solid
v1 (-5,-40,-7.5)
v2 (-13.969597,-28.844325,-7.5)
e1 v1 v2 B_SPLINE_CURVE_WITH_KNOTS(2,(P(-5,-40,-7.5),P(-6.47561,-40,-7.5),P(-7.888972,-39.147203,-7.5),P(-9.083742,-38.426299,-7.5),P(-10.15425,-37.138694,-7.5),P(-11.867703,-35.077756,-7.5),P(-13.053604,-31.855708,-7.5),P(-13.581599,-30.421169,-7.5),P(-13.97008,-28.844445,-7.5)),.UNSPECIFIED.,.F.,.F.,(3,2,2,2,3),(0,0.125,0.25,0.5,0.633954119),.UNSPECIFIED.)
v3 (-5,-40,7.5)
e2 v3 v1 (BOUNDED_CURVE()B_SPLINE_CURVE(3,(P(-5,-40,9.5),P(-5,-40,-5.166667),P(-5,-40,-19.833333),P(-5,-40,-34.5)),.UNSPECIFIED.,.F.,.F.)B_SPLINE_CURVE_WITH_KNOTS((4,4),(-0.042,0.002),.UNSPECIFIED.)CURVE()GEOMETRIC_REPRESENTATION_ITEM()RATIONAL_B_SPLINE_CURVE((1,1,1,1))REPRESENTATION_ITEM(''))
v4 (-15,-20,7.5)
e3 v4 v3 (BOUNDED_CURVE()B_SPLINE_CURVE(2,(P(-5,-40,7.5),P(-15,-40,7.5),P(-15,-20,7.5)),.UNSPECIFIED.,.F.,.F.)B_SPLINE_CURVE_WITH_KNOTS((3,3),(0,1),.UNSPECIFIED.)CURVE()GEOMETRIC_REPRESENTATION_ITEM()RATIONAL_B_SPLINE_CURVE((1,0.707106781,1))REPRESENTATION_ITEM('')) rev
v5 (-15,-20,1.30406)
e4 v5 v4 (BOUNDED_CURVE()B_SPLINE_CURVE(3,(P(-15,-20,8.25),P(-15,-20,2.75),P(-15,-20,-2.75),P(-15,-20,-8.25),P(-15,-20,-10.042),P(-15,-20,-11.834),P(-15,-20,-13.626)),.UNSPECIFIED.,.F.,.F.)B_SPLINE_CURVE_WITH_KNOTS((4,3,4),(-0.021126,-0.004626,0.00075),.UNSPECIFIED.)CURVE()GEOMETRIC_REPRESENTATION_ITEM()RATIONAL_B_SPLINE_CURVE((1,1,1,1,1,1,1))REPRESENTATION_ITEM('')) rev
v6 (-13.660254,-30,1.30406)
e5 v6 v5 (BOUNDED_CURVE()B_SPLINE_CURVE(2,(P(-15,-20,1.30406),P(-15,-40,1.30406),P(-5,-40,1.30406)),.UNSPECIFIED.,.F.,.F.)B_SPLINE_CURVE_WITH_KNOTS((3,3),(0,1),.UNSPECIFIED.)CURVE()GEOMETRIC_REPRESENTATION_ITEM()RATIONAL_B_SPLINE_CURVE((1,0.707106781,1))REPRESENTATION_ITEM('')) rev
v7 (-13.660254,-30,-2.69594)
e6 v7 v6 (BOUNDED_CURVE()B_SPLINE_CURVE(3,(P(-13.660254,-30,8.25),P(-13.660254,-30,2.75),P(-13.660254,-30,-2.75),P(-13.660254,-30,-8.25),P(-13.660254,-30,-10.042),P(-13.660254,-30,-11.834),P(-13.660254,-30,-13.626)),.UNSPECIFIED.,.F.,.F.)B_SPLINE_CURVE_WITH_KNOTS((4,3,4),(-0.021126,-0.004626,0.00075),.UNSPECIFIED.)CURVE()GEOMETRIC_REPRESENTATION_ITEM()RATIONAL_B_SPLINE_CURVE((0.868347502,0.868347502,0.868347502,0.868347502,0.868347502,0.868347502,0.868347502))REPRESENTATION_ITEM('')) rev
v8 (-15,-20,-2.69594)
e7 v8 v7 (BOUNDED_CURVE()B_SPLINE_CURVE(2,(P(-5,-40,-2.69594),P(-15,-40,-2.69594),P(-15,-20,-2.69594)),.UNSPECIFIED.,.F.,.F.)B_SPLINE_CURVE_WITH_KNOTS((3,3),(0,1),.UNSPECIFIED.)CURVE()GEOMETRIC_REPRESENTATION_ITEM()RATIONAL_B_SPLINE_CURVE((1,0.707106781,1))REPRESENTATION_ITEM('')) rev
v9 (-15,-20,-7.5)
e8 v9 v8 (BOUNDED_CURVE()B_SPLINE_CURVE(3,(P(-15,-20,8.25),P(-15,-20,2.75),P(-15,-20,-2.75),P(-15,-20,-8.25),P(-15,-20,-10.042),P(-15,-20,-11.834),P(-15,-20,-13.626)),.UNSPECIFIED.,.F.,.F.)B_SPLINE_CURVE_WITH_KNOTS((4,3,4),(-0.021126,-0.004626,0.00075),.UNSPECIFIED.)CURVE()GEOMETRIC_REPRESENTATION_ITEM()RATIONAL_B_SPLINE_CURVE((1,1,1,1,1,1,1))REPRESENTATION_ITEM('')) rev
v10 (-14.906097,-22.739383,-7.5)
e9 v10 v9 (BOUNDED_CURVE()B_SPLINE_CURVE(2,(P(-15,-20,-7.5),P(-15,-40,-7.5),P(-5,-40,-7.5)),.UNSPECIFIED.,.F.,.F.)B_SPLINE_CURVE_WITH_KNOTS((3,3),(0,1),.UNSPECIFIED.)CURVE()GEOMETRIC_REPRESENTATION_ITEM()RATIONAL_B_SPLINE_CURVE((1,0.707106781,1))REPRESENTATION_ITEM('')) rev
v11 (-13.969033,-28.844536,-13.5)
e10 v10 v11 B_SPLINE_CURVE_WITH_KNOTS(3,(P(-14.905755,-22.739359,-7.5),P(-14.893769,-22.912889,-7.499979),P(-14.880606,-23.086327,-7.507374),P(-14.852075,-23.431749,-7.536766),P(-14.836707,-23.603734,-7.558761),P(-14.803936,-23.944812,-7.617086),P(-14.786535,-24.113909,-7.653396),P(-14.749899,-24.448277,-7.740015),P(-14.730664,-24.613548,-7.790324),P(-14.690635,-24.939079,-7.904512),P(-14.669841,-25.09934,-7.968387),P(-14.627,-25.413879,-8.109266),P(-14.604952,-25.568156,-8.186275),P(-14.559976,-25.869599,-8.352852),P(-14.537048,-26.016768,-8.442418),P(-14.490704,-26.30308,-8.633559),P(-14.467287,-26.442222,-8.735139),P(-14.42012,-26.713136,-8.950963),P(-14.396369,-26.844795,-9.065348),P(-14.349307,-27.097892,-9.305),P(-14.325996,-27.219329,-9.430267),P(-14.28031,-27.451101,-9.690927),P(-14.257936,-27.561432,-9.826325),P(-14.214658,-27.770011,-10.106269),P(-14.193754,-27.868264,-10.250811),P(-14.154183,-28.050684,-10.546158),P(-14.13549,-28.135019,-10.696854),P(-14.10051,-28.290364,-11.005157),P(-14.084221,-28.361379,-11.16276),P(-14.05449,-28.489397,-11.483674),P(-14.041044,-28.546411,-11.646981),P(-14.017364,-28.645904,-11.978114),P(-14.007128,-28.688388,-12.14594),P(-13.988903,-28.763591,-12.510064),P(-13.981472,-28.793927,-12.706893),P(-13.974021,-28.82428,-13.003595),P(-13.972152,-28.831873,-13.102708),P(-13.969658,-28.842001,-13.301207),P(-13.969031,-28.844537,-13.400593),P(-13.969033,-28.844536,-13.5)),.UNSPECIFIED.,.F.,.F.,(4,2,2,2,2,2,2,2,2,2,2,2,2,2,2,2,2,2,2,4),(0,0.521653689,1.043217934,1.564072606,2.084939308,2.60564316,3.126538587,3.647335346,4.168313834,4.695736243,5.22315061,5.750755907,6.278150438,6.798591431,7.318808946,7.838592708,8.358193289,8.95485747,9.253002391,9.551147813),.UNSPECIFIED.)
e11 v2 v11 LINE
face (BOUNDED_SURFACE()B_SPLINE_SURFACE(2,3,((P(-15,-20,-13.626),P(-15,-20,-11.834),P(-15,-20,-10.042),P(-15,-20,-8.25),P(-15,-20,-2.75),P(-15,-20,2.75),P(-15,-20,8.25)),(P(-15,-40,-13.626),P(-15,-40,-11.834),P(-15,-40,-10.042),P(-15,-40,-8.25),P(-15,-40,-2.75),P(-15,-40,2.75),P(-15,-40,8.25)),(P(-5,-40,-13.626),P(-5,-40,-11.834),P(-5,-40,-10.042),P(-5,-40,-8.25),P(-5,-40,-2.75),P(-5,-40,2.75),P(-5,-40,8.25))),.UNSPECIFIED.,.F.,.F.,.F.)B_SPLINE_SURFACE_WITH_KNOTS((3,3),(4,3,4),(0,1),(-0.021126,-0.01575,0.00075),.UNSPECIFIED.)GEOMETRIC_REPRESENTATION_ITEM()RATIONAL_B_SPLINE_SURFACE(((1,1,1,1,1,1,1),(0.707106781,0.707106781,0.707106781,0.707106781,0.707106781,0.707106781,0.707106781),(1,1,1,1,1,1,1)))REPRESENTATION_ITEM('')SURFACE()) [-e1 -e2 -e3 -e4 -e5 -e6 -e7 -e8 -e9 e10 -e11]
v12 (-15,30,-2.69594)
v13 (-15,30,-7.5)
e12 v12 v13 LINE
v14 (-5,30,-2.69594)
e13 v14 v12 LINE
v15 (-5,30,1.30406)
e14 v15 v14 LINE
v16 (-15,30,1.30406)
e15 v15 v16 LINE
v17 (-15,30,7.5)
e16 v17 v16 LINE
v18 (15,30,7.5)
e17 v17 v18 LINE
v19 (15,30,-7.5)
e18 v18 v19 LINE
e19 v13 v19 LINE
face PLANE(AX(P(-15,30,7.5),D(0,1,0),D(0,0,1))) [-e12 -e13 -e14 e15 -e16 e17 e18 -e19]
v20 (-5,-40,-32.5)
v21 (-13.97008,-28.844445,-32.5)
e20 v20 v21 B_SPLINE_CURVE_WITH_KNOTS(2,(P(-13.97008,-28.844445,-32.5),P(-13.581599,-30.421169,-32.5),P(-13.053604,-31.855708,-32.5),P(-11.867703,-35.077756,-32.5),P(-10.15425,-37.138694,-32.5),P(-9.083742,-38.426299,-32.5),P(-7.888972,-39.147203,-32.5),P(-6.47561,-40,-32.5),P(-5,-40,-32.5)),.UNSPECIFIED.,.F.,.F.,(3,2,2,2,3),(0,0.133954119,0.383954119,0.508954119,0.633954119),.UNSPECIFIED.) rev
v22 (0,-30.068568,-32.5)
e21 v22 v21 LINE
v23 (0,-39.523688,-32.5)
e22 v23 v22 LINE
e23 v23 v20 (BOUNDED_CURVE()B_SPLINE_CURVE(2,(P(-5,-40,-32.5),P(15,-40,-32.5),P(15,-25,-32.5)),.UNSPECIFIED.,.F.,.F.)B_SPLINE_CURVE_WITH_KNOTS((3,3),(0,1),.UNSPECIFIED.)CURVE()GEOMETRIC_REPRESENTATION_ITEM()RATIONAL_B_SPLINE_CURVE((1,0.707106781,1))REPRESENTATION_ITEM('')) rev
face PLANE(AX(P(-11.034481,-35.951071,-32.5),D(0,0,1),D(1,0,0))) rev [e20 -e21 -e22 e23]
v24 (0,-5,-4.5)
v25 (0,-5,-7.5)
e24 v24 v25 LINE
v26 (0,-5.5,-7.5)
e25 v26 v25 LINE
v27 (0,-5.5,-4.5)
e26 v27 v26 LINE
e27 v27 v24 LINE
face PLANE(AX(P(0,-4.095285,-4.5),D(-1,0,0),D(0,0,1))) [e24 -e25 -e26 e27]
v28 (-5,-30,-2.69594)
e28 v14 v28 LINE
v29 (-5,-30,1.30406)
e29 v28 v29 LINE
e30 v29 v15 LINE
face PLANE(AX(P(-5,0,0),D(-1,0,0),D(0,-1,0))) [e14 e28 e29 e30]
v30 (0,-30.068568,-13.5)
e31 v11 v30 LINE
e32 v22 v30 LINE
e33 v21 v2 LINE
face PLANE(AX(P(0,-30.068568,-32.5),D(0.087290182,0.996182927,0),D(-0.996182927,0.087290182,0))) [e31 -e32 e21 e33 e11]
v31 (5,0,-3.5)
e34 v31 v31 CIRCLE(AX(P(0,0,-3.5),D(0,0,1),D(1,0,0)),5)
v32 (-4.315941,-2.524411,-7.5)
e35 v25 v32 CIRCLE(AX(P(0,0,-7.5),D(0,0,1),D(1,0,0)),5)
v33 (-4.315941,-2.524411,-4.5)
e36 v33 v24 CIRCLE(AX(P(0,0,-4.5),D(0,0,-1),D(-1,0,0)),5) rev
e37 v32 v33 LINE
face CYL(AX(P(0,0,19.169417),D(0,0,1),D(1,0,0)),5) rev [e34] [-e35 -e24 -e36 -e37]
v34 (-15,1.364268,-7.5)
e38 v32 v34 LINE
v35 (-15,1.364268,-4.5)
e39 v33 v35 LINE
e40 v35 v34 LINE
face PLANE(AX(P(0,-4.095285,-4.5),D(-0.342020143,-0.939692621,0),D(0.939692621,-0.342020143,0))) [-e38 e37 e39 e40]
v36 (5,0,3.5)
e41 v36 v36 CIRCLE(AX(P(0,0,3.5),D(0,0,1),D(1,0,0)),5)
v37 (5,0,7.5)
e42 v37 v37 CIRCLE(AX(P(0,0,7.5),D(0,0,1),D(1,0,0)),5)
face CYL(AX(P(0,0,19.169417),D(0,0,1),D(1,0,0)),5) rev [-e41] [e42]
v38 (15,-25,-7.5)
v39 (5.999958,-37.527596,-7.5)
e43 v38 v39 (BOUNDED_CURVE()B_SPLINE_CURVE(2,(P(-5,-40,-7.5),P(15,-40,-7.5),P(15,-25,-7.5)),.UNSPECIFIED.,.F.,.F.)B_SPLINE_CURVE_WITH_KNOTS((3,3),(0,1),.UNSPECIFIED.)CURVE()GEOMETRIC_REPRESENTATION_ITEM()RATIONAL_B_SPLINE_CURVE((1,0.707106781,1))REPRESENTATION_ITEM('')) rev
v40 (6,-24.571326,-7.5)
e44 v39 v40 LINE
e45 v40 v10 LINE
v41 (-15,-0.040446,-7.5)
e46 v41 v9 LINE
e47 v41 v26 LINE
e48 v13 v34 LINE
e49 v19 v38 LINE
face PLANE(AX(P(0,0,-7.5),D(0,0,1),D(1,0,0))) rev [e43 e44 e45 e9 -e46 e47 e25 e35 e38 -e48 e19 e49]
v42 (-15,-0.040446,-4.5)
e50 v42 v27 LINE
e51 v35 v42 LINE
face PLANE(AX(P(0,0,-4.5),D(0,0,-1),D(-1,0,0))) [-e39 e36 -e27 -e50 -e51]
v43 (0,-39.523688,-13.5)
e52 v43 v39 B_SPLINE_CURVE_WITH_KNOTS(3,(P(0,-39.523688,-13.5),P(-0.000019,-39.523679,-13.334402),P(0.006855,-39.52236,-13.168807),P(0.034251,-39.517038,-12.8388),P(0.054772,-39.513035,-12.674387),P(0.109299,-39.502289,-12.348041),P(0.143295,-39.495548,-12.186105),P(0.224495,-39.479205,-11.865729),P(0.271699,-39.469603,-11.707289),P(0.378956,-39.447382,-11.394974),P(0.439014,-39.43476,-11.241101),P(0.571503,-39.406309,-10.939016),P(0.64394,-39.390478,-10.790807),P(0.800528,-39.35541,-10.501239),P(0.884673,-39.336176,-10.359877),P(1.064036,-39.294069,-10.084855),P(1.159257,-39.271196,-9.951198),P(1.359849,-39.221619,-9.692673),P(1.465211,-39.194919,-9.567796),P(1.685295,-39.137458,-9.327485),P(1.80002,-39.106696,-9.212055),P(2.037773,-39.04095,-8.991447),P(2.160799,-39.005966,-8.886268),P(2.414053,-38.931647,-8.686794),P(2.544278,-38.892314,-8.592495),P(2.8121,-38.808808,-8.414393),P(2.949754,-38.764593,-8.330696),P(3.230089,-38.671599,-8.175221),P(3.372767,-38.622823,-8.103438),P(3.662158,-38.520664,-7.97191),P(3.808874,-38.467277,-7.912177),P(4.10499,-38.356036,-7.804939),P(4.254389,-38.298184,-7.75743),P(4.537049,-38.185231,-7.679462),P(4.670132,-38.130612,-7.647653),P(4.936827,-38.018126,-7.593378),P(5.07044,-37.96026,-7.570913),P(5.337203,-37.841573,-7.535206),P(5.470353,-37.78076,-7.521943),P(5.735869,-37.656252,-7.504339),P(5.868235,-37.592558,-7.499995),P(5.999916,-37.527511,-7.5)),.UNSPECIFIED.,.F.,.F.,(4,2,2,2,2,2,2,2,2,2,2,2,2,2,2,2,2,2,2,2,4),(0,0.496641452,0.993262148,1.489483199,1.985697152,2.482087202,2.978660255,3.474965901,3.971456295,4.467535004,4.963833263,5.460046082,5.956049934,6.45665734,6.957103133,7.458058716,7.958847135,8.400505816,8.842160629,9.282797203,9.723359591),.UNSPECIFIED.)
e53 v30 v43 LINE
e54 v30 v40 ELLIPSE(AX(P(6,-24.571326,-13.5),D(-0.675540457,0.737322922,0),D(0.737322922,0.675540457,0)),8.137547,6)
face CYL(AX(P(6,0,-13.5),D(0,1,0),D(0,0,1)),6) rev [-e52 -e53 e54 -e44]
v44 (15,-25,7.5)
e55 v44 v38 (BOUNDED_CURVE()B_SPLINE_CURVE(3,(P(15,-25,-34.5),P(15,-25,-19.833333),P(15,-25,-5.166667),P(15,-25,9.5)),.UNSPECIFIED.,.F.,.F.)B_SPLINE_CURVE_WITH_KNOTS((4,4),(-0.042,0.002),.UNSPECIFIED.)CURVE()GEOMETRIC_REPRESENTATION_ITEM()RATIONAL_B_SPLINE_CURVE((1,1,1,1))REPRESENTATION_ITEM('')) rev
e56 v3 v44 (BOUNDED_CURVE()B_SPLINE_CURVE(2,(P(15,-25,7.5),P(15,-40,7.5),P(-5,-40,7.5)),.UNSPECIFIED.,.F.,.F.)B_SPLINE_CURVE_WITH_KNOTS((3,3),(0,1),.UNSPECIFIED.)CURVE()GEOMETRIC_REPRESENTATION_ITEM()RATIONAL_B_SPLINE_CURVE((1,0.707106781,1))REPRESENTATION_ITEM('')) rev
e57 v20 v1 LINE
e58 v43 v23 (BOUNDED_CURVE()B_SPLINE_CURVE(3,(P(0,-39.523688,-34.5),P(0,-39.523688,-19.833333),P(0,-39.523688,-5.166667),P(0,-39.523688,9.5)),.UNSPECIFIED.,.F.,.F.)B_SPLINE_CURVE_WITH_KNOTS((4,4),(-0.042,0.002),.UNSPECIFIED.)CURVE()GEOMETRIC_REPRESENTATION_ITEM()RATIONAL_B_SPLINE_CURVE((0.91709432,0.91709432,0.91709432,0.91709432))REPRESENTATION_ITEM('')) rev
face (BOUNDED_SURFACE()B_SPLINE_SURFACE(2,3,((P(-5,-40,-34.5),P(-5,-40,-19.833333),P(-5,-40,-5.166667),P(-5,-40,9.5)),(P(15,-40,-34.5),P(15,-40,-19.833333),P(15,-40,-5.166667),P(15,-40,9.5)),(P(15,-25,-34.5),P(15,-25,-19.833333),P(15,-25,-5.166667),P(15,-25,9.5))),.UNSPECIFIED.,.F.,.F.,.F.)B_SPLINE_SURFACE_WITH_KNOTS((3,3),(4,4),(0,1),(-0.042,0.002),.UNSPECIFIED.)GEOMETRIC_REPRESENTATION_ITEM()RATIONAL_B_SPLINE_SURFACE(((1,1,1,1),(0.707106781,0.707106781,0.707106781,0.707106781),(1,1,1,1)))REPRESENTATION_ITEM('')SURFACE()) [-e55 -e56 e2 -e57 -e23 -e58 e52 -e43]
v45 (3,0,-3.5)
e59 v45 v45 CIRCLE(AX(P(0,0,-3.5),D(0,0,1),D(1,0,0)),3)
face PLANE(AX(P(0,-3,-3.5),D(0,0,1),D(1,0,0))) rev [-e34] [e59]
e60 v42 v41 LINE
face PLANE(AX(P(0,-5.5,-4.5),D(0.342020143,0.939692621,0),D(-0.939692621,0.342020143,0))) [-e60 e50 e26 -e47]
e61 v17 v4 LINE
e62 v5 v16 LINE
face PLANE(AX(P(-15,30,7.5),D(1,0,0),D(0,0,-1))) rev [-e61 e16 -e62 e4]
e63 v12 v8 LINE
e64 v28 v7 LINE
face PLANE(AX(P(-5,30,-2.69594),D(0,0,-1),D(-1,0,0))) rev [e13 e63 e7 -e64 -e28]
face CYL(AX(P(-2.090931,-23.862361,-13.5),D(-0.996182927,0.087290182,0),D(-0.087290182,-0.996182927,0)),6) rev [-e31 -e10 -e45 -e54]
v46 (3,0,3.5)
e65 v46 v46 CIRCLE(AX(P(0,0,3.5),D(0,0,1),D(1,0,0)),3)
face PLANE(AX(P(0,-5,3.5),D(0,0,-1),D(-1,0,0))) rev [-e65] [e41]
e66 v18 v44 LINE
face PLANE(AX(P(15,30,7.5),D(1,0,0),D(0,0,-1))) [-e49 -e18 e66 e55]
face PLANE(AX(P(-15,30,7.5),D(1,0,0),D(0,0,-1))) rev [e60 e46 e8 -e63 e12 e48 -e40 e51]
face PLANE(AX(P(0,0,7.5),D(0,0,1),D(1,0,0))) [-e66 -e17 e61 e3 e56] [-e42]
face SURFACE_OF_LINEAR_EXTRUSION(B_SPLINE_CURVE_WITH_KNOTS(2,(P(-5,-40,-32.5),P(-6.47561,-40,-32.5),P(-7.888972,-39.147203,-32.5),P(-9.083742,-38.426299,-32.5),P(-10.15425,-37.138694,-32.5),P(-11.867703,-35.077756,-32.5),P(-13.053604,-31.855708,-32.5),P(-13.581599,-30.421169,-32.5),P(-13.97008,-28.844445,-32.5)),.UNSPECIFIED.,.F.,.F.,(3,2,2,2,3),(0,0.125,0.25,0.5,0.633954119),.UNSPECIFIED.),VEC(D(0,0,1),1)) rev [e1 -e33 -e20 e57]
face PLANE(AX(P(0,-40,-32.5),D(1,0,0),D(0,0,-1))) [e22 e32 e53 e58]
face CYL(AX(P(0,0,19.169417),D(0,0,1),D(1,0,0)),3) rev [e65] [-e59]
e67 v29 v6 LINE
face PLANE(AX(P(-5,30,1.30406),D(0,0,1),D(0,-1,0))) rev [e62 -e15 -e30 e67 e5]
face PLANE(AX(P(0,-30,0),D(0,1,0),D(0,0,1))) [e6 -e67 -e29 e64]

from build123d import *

# Parameters (mm, degrees)
SKETCH1_W           = 30
SKETCH1_H           = 60
BOSS_EXTRUDE1_DEPTH = 7.5
SKETCH4_W           = 4
SKETCH4_H           = 60
CUT_EXTRUDE1_DEPTH  = 10
CUT_EXTRUDE2_DEPTH  = 3
SKETCH6_W           = 30
SKETCH6_H           = 15
BOSS_EXTRUDE2_DEPTH = 10
FILLET1_SIZE        = 10
FILLET1_SIZE_2      = 20
BOSS_EXTRUDE3_DEPTH = 25
FILLET2_SIZE        = 20
FILLET2_SIZE_2      = 15
FILLET3_R           = 6
FILLET4_R           = 6


with BuildPart() as part:
    # Sketch1 → Boss-Extrude1 (new, symmetric)
    with BuildSketch(Plane.XY):
        Rectangle(SKETCH1_W, SKETCH1_H)
    extrude(amount=BOSS_EXTRUDE1_DEPTH, both=True)

    # Sketch3 → Cut-Revolve1 (revolve, cut)
    with BuildSketch(Plane(origin=(0, 0, 0), x_dir=(0, 0, -1), z_dir=(1, 0, 0)), mode=Mode.PRIVATE) as cut_revolve1_sk:
        Polygon((-7.5, -5), (-3.5, -5), (-3.5, -3), (3.5, -3), (3.5, -5), (7.5, -5), (7.5, 0), (-7.5, 0), align=None)
    revolve(cut_revolve1_sk.sketch.rotate(Axis((0, 0, 19.169416837), (0, 0, -1)), 270), axis=Axis((0, 0, 19.169416837), (0, 0, -1)), mode=Mode.SUBTRACT)

    # Sketch4 → Cut-Extrude1 (cut)
    with BuildSketch(Plane.ZY.offset(15)):
        with Locations((-0.695939916, 0)):
            Rectangle(SKETCH4_W, SKETCH4_H)
    extrude(amount=-CUT_EXTRUDE1_DEPTH, mode=Mode.SUBTRACT)

    # Sketch5 → Cut-Extrude2 (cut)
    with BuildSketch(Plane.XY.offset(-7.5)):
        Polygon((0, -5.5), (-15, -0.040446486), (-15, 1.364268174), (0, -4.09528534), align=None)
    extrude(amount=CUT_EXTRUDE2_DEPTH, mode=Mode.SUBTRACT)

    # Sketch6 → Boss-Extrude2 (add)
    with BuildSketch(Plane(origin=(0, -30, 0), x_dir=(1, 0, 0), z_dir=(0, 1, 0))):
        Rectangle(SKETCH6_W, SKETCH6_H)
    extrude(amount=-BOSS_EXTRUDE2_DEPTH)

    # Fillet1
    # an asymmetric fillet: 20, 10 mm, written as the material it takes off along each edge
    with BuildSketch(Plane(origin=(-15, -40, 57.5), x_dir=(1, 0, 0), z_dir=(0, 0, -1))) as fillet1_piece_1:
        with BuildLine():
            Bezier((FILLET1_SIZE, 0), (0, 0), (0, -FILLET1_SIZE_2), weights=[1, 0.707106781, 1])
            Line((0, -FILLET1_SIZE_2), (0, 0))
            Line((0, 0), (FILLET1_SIZE, 0))
        make_face()
    extrude(amount=115, mode=Mode.SUBTRACT)

    # Sketch7<5> → Boss-Extrude3 (add)
    with BuildSketch(Plane(origin=(0, 0, -7.5), x_dir=(-1, 0, 0), z_dir=(0, 0, -1))):
        with BuildLine():
            Line((0, -30.068567995), (13.97008046, -28.844444564))
            add(Edge.make_bspline(
                [(5, -40), (6.475610406, -40), (7.888971767, -39.147202629), (9.083741797, -38.42629942), (10.154249723, -37.138694208), (11.86770272, -35.0777557), (13.053604417, -31.855708482), (13.581598782, -30.421169024), (13.97008046, -28.844444564)],
                knots=[0, 0, 0, 0.125, 0.125, 0.25, 0.25, 0.5, 0.5, 0.633954119, 0.633954119, 0.633954119], degree=2))
            Line((5, -40), (0, -40))
            Line((0, -40), (0, -30.068567995))
        make_face()
    extrude(amount=BOSS_EXTRUDE3_DEPTH)

    # Fillet2
    # an asymmetric fillet: 20, 15 mm, written as the material it takes off along each edge
    with BuildSketch(Plane(origin=(15, -40, -57.5), x_dir=(-1, 0, 0), z_dir=(0, 0, 1))) as fillet2_piece_1:
        with BuildLine():
            Bezier((FILLET2_SIZE, 0), (0, 0), (0, -FILLET2_SIZE_2), weights=[1, 0.707106781, 1])
            Line((0, -FILLET2_SIZE_2), (0, 0))
            Line((0, 0), (FILLET2_SIZE, 0))
        make_face()
    extrude(amount=115, mode=Mode.SUBTRACT)

    # Fillet3
    fillet3_edges = [part.edges().sort_by_distance(p)[0] for p in [
        (0, -34.796127772, -7.5),
    ]]
    fillet(fillet3_edges, radius=FILLET3_R)

    # Fillet4
    fillet4_edges = [part.edges().sort_by_distance(p)[0] for p in [
        (-3.984516256, -29.719426147, -7.5),
    ]]
    fillet(fillet4_edges, radius=FILLET4_R)


solid = part.part
